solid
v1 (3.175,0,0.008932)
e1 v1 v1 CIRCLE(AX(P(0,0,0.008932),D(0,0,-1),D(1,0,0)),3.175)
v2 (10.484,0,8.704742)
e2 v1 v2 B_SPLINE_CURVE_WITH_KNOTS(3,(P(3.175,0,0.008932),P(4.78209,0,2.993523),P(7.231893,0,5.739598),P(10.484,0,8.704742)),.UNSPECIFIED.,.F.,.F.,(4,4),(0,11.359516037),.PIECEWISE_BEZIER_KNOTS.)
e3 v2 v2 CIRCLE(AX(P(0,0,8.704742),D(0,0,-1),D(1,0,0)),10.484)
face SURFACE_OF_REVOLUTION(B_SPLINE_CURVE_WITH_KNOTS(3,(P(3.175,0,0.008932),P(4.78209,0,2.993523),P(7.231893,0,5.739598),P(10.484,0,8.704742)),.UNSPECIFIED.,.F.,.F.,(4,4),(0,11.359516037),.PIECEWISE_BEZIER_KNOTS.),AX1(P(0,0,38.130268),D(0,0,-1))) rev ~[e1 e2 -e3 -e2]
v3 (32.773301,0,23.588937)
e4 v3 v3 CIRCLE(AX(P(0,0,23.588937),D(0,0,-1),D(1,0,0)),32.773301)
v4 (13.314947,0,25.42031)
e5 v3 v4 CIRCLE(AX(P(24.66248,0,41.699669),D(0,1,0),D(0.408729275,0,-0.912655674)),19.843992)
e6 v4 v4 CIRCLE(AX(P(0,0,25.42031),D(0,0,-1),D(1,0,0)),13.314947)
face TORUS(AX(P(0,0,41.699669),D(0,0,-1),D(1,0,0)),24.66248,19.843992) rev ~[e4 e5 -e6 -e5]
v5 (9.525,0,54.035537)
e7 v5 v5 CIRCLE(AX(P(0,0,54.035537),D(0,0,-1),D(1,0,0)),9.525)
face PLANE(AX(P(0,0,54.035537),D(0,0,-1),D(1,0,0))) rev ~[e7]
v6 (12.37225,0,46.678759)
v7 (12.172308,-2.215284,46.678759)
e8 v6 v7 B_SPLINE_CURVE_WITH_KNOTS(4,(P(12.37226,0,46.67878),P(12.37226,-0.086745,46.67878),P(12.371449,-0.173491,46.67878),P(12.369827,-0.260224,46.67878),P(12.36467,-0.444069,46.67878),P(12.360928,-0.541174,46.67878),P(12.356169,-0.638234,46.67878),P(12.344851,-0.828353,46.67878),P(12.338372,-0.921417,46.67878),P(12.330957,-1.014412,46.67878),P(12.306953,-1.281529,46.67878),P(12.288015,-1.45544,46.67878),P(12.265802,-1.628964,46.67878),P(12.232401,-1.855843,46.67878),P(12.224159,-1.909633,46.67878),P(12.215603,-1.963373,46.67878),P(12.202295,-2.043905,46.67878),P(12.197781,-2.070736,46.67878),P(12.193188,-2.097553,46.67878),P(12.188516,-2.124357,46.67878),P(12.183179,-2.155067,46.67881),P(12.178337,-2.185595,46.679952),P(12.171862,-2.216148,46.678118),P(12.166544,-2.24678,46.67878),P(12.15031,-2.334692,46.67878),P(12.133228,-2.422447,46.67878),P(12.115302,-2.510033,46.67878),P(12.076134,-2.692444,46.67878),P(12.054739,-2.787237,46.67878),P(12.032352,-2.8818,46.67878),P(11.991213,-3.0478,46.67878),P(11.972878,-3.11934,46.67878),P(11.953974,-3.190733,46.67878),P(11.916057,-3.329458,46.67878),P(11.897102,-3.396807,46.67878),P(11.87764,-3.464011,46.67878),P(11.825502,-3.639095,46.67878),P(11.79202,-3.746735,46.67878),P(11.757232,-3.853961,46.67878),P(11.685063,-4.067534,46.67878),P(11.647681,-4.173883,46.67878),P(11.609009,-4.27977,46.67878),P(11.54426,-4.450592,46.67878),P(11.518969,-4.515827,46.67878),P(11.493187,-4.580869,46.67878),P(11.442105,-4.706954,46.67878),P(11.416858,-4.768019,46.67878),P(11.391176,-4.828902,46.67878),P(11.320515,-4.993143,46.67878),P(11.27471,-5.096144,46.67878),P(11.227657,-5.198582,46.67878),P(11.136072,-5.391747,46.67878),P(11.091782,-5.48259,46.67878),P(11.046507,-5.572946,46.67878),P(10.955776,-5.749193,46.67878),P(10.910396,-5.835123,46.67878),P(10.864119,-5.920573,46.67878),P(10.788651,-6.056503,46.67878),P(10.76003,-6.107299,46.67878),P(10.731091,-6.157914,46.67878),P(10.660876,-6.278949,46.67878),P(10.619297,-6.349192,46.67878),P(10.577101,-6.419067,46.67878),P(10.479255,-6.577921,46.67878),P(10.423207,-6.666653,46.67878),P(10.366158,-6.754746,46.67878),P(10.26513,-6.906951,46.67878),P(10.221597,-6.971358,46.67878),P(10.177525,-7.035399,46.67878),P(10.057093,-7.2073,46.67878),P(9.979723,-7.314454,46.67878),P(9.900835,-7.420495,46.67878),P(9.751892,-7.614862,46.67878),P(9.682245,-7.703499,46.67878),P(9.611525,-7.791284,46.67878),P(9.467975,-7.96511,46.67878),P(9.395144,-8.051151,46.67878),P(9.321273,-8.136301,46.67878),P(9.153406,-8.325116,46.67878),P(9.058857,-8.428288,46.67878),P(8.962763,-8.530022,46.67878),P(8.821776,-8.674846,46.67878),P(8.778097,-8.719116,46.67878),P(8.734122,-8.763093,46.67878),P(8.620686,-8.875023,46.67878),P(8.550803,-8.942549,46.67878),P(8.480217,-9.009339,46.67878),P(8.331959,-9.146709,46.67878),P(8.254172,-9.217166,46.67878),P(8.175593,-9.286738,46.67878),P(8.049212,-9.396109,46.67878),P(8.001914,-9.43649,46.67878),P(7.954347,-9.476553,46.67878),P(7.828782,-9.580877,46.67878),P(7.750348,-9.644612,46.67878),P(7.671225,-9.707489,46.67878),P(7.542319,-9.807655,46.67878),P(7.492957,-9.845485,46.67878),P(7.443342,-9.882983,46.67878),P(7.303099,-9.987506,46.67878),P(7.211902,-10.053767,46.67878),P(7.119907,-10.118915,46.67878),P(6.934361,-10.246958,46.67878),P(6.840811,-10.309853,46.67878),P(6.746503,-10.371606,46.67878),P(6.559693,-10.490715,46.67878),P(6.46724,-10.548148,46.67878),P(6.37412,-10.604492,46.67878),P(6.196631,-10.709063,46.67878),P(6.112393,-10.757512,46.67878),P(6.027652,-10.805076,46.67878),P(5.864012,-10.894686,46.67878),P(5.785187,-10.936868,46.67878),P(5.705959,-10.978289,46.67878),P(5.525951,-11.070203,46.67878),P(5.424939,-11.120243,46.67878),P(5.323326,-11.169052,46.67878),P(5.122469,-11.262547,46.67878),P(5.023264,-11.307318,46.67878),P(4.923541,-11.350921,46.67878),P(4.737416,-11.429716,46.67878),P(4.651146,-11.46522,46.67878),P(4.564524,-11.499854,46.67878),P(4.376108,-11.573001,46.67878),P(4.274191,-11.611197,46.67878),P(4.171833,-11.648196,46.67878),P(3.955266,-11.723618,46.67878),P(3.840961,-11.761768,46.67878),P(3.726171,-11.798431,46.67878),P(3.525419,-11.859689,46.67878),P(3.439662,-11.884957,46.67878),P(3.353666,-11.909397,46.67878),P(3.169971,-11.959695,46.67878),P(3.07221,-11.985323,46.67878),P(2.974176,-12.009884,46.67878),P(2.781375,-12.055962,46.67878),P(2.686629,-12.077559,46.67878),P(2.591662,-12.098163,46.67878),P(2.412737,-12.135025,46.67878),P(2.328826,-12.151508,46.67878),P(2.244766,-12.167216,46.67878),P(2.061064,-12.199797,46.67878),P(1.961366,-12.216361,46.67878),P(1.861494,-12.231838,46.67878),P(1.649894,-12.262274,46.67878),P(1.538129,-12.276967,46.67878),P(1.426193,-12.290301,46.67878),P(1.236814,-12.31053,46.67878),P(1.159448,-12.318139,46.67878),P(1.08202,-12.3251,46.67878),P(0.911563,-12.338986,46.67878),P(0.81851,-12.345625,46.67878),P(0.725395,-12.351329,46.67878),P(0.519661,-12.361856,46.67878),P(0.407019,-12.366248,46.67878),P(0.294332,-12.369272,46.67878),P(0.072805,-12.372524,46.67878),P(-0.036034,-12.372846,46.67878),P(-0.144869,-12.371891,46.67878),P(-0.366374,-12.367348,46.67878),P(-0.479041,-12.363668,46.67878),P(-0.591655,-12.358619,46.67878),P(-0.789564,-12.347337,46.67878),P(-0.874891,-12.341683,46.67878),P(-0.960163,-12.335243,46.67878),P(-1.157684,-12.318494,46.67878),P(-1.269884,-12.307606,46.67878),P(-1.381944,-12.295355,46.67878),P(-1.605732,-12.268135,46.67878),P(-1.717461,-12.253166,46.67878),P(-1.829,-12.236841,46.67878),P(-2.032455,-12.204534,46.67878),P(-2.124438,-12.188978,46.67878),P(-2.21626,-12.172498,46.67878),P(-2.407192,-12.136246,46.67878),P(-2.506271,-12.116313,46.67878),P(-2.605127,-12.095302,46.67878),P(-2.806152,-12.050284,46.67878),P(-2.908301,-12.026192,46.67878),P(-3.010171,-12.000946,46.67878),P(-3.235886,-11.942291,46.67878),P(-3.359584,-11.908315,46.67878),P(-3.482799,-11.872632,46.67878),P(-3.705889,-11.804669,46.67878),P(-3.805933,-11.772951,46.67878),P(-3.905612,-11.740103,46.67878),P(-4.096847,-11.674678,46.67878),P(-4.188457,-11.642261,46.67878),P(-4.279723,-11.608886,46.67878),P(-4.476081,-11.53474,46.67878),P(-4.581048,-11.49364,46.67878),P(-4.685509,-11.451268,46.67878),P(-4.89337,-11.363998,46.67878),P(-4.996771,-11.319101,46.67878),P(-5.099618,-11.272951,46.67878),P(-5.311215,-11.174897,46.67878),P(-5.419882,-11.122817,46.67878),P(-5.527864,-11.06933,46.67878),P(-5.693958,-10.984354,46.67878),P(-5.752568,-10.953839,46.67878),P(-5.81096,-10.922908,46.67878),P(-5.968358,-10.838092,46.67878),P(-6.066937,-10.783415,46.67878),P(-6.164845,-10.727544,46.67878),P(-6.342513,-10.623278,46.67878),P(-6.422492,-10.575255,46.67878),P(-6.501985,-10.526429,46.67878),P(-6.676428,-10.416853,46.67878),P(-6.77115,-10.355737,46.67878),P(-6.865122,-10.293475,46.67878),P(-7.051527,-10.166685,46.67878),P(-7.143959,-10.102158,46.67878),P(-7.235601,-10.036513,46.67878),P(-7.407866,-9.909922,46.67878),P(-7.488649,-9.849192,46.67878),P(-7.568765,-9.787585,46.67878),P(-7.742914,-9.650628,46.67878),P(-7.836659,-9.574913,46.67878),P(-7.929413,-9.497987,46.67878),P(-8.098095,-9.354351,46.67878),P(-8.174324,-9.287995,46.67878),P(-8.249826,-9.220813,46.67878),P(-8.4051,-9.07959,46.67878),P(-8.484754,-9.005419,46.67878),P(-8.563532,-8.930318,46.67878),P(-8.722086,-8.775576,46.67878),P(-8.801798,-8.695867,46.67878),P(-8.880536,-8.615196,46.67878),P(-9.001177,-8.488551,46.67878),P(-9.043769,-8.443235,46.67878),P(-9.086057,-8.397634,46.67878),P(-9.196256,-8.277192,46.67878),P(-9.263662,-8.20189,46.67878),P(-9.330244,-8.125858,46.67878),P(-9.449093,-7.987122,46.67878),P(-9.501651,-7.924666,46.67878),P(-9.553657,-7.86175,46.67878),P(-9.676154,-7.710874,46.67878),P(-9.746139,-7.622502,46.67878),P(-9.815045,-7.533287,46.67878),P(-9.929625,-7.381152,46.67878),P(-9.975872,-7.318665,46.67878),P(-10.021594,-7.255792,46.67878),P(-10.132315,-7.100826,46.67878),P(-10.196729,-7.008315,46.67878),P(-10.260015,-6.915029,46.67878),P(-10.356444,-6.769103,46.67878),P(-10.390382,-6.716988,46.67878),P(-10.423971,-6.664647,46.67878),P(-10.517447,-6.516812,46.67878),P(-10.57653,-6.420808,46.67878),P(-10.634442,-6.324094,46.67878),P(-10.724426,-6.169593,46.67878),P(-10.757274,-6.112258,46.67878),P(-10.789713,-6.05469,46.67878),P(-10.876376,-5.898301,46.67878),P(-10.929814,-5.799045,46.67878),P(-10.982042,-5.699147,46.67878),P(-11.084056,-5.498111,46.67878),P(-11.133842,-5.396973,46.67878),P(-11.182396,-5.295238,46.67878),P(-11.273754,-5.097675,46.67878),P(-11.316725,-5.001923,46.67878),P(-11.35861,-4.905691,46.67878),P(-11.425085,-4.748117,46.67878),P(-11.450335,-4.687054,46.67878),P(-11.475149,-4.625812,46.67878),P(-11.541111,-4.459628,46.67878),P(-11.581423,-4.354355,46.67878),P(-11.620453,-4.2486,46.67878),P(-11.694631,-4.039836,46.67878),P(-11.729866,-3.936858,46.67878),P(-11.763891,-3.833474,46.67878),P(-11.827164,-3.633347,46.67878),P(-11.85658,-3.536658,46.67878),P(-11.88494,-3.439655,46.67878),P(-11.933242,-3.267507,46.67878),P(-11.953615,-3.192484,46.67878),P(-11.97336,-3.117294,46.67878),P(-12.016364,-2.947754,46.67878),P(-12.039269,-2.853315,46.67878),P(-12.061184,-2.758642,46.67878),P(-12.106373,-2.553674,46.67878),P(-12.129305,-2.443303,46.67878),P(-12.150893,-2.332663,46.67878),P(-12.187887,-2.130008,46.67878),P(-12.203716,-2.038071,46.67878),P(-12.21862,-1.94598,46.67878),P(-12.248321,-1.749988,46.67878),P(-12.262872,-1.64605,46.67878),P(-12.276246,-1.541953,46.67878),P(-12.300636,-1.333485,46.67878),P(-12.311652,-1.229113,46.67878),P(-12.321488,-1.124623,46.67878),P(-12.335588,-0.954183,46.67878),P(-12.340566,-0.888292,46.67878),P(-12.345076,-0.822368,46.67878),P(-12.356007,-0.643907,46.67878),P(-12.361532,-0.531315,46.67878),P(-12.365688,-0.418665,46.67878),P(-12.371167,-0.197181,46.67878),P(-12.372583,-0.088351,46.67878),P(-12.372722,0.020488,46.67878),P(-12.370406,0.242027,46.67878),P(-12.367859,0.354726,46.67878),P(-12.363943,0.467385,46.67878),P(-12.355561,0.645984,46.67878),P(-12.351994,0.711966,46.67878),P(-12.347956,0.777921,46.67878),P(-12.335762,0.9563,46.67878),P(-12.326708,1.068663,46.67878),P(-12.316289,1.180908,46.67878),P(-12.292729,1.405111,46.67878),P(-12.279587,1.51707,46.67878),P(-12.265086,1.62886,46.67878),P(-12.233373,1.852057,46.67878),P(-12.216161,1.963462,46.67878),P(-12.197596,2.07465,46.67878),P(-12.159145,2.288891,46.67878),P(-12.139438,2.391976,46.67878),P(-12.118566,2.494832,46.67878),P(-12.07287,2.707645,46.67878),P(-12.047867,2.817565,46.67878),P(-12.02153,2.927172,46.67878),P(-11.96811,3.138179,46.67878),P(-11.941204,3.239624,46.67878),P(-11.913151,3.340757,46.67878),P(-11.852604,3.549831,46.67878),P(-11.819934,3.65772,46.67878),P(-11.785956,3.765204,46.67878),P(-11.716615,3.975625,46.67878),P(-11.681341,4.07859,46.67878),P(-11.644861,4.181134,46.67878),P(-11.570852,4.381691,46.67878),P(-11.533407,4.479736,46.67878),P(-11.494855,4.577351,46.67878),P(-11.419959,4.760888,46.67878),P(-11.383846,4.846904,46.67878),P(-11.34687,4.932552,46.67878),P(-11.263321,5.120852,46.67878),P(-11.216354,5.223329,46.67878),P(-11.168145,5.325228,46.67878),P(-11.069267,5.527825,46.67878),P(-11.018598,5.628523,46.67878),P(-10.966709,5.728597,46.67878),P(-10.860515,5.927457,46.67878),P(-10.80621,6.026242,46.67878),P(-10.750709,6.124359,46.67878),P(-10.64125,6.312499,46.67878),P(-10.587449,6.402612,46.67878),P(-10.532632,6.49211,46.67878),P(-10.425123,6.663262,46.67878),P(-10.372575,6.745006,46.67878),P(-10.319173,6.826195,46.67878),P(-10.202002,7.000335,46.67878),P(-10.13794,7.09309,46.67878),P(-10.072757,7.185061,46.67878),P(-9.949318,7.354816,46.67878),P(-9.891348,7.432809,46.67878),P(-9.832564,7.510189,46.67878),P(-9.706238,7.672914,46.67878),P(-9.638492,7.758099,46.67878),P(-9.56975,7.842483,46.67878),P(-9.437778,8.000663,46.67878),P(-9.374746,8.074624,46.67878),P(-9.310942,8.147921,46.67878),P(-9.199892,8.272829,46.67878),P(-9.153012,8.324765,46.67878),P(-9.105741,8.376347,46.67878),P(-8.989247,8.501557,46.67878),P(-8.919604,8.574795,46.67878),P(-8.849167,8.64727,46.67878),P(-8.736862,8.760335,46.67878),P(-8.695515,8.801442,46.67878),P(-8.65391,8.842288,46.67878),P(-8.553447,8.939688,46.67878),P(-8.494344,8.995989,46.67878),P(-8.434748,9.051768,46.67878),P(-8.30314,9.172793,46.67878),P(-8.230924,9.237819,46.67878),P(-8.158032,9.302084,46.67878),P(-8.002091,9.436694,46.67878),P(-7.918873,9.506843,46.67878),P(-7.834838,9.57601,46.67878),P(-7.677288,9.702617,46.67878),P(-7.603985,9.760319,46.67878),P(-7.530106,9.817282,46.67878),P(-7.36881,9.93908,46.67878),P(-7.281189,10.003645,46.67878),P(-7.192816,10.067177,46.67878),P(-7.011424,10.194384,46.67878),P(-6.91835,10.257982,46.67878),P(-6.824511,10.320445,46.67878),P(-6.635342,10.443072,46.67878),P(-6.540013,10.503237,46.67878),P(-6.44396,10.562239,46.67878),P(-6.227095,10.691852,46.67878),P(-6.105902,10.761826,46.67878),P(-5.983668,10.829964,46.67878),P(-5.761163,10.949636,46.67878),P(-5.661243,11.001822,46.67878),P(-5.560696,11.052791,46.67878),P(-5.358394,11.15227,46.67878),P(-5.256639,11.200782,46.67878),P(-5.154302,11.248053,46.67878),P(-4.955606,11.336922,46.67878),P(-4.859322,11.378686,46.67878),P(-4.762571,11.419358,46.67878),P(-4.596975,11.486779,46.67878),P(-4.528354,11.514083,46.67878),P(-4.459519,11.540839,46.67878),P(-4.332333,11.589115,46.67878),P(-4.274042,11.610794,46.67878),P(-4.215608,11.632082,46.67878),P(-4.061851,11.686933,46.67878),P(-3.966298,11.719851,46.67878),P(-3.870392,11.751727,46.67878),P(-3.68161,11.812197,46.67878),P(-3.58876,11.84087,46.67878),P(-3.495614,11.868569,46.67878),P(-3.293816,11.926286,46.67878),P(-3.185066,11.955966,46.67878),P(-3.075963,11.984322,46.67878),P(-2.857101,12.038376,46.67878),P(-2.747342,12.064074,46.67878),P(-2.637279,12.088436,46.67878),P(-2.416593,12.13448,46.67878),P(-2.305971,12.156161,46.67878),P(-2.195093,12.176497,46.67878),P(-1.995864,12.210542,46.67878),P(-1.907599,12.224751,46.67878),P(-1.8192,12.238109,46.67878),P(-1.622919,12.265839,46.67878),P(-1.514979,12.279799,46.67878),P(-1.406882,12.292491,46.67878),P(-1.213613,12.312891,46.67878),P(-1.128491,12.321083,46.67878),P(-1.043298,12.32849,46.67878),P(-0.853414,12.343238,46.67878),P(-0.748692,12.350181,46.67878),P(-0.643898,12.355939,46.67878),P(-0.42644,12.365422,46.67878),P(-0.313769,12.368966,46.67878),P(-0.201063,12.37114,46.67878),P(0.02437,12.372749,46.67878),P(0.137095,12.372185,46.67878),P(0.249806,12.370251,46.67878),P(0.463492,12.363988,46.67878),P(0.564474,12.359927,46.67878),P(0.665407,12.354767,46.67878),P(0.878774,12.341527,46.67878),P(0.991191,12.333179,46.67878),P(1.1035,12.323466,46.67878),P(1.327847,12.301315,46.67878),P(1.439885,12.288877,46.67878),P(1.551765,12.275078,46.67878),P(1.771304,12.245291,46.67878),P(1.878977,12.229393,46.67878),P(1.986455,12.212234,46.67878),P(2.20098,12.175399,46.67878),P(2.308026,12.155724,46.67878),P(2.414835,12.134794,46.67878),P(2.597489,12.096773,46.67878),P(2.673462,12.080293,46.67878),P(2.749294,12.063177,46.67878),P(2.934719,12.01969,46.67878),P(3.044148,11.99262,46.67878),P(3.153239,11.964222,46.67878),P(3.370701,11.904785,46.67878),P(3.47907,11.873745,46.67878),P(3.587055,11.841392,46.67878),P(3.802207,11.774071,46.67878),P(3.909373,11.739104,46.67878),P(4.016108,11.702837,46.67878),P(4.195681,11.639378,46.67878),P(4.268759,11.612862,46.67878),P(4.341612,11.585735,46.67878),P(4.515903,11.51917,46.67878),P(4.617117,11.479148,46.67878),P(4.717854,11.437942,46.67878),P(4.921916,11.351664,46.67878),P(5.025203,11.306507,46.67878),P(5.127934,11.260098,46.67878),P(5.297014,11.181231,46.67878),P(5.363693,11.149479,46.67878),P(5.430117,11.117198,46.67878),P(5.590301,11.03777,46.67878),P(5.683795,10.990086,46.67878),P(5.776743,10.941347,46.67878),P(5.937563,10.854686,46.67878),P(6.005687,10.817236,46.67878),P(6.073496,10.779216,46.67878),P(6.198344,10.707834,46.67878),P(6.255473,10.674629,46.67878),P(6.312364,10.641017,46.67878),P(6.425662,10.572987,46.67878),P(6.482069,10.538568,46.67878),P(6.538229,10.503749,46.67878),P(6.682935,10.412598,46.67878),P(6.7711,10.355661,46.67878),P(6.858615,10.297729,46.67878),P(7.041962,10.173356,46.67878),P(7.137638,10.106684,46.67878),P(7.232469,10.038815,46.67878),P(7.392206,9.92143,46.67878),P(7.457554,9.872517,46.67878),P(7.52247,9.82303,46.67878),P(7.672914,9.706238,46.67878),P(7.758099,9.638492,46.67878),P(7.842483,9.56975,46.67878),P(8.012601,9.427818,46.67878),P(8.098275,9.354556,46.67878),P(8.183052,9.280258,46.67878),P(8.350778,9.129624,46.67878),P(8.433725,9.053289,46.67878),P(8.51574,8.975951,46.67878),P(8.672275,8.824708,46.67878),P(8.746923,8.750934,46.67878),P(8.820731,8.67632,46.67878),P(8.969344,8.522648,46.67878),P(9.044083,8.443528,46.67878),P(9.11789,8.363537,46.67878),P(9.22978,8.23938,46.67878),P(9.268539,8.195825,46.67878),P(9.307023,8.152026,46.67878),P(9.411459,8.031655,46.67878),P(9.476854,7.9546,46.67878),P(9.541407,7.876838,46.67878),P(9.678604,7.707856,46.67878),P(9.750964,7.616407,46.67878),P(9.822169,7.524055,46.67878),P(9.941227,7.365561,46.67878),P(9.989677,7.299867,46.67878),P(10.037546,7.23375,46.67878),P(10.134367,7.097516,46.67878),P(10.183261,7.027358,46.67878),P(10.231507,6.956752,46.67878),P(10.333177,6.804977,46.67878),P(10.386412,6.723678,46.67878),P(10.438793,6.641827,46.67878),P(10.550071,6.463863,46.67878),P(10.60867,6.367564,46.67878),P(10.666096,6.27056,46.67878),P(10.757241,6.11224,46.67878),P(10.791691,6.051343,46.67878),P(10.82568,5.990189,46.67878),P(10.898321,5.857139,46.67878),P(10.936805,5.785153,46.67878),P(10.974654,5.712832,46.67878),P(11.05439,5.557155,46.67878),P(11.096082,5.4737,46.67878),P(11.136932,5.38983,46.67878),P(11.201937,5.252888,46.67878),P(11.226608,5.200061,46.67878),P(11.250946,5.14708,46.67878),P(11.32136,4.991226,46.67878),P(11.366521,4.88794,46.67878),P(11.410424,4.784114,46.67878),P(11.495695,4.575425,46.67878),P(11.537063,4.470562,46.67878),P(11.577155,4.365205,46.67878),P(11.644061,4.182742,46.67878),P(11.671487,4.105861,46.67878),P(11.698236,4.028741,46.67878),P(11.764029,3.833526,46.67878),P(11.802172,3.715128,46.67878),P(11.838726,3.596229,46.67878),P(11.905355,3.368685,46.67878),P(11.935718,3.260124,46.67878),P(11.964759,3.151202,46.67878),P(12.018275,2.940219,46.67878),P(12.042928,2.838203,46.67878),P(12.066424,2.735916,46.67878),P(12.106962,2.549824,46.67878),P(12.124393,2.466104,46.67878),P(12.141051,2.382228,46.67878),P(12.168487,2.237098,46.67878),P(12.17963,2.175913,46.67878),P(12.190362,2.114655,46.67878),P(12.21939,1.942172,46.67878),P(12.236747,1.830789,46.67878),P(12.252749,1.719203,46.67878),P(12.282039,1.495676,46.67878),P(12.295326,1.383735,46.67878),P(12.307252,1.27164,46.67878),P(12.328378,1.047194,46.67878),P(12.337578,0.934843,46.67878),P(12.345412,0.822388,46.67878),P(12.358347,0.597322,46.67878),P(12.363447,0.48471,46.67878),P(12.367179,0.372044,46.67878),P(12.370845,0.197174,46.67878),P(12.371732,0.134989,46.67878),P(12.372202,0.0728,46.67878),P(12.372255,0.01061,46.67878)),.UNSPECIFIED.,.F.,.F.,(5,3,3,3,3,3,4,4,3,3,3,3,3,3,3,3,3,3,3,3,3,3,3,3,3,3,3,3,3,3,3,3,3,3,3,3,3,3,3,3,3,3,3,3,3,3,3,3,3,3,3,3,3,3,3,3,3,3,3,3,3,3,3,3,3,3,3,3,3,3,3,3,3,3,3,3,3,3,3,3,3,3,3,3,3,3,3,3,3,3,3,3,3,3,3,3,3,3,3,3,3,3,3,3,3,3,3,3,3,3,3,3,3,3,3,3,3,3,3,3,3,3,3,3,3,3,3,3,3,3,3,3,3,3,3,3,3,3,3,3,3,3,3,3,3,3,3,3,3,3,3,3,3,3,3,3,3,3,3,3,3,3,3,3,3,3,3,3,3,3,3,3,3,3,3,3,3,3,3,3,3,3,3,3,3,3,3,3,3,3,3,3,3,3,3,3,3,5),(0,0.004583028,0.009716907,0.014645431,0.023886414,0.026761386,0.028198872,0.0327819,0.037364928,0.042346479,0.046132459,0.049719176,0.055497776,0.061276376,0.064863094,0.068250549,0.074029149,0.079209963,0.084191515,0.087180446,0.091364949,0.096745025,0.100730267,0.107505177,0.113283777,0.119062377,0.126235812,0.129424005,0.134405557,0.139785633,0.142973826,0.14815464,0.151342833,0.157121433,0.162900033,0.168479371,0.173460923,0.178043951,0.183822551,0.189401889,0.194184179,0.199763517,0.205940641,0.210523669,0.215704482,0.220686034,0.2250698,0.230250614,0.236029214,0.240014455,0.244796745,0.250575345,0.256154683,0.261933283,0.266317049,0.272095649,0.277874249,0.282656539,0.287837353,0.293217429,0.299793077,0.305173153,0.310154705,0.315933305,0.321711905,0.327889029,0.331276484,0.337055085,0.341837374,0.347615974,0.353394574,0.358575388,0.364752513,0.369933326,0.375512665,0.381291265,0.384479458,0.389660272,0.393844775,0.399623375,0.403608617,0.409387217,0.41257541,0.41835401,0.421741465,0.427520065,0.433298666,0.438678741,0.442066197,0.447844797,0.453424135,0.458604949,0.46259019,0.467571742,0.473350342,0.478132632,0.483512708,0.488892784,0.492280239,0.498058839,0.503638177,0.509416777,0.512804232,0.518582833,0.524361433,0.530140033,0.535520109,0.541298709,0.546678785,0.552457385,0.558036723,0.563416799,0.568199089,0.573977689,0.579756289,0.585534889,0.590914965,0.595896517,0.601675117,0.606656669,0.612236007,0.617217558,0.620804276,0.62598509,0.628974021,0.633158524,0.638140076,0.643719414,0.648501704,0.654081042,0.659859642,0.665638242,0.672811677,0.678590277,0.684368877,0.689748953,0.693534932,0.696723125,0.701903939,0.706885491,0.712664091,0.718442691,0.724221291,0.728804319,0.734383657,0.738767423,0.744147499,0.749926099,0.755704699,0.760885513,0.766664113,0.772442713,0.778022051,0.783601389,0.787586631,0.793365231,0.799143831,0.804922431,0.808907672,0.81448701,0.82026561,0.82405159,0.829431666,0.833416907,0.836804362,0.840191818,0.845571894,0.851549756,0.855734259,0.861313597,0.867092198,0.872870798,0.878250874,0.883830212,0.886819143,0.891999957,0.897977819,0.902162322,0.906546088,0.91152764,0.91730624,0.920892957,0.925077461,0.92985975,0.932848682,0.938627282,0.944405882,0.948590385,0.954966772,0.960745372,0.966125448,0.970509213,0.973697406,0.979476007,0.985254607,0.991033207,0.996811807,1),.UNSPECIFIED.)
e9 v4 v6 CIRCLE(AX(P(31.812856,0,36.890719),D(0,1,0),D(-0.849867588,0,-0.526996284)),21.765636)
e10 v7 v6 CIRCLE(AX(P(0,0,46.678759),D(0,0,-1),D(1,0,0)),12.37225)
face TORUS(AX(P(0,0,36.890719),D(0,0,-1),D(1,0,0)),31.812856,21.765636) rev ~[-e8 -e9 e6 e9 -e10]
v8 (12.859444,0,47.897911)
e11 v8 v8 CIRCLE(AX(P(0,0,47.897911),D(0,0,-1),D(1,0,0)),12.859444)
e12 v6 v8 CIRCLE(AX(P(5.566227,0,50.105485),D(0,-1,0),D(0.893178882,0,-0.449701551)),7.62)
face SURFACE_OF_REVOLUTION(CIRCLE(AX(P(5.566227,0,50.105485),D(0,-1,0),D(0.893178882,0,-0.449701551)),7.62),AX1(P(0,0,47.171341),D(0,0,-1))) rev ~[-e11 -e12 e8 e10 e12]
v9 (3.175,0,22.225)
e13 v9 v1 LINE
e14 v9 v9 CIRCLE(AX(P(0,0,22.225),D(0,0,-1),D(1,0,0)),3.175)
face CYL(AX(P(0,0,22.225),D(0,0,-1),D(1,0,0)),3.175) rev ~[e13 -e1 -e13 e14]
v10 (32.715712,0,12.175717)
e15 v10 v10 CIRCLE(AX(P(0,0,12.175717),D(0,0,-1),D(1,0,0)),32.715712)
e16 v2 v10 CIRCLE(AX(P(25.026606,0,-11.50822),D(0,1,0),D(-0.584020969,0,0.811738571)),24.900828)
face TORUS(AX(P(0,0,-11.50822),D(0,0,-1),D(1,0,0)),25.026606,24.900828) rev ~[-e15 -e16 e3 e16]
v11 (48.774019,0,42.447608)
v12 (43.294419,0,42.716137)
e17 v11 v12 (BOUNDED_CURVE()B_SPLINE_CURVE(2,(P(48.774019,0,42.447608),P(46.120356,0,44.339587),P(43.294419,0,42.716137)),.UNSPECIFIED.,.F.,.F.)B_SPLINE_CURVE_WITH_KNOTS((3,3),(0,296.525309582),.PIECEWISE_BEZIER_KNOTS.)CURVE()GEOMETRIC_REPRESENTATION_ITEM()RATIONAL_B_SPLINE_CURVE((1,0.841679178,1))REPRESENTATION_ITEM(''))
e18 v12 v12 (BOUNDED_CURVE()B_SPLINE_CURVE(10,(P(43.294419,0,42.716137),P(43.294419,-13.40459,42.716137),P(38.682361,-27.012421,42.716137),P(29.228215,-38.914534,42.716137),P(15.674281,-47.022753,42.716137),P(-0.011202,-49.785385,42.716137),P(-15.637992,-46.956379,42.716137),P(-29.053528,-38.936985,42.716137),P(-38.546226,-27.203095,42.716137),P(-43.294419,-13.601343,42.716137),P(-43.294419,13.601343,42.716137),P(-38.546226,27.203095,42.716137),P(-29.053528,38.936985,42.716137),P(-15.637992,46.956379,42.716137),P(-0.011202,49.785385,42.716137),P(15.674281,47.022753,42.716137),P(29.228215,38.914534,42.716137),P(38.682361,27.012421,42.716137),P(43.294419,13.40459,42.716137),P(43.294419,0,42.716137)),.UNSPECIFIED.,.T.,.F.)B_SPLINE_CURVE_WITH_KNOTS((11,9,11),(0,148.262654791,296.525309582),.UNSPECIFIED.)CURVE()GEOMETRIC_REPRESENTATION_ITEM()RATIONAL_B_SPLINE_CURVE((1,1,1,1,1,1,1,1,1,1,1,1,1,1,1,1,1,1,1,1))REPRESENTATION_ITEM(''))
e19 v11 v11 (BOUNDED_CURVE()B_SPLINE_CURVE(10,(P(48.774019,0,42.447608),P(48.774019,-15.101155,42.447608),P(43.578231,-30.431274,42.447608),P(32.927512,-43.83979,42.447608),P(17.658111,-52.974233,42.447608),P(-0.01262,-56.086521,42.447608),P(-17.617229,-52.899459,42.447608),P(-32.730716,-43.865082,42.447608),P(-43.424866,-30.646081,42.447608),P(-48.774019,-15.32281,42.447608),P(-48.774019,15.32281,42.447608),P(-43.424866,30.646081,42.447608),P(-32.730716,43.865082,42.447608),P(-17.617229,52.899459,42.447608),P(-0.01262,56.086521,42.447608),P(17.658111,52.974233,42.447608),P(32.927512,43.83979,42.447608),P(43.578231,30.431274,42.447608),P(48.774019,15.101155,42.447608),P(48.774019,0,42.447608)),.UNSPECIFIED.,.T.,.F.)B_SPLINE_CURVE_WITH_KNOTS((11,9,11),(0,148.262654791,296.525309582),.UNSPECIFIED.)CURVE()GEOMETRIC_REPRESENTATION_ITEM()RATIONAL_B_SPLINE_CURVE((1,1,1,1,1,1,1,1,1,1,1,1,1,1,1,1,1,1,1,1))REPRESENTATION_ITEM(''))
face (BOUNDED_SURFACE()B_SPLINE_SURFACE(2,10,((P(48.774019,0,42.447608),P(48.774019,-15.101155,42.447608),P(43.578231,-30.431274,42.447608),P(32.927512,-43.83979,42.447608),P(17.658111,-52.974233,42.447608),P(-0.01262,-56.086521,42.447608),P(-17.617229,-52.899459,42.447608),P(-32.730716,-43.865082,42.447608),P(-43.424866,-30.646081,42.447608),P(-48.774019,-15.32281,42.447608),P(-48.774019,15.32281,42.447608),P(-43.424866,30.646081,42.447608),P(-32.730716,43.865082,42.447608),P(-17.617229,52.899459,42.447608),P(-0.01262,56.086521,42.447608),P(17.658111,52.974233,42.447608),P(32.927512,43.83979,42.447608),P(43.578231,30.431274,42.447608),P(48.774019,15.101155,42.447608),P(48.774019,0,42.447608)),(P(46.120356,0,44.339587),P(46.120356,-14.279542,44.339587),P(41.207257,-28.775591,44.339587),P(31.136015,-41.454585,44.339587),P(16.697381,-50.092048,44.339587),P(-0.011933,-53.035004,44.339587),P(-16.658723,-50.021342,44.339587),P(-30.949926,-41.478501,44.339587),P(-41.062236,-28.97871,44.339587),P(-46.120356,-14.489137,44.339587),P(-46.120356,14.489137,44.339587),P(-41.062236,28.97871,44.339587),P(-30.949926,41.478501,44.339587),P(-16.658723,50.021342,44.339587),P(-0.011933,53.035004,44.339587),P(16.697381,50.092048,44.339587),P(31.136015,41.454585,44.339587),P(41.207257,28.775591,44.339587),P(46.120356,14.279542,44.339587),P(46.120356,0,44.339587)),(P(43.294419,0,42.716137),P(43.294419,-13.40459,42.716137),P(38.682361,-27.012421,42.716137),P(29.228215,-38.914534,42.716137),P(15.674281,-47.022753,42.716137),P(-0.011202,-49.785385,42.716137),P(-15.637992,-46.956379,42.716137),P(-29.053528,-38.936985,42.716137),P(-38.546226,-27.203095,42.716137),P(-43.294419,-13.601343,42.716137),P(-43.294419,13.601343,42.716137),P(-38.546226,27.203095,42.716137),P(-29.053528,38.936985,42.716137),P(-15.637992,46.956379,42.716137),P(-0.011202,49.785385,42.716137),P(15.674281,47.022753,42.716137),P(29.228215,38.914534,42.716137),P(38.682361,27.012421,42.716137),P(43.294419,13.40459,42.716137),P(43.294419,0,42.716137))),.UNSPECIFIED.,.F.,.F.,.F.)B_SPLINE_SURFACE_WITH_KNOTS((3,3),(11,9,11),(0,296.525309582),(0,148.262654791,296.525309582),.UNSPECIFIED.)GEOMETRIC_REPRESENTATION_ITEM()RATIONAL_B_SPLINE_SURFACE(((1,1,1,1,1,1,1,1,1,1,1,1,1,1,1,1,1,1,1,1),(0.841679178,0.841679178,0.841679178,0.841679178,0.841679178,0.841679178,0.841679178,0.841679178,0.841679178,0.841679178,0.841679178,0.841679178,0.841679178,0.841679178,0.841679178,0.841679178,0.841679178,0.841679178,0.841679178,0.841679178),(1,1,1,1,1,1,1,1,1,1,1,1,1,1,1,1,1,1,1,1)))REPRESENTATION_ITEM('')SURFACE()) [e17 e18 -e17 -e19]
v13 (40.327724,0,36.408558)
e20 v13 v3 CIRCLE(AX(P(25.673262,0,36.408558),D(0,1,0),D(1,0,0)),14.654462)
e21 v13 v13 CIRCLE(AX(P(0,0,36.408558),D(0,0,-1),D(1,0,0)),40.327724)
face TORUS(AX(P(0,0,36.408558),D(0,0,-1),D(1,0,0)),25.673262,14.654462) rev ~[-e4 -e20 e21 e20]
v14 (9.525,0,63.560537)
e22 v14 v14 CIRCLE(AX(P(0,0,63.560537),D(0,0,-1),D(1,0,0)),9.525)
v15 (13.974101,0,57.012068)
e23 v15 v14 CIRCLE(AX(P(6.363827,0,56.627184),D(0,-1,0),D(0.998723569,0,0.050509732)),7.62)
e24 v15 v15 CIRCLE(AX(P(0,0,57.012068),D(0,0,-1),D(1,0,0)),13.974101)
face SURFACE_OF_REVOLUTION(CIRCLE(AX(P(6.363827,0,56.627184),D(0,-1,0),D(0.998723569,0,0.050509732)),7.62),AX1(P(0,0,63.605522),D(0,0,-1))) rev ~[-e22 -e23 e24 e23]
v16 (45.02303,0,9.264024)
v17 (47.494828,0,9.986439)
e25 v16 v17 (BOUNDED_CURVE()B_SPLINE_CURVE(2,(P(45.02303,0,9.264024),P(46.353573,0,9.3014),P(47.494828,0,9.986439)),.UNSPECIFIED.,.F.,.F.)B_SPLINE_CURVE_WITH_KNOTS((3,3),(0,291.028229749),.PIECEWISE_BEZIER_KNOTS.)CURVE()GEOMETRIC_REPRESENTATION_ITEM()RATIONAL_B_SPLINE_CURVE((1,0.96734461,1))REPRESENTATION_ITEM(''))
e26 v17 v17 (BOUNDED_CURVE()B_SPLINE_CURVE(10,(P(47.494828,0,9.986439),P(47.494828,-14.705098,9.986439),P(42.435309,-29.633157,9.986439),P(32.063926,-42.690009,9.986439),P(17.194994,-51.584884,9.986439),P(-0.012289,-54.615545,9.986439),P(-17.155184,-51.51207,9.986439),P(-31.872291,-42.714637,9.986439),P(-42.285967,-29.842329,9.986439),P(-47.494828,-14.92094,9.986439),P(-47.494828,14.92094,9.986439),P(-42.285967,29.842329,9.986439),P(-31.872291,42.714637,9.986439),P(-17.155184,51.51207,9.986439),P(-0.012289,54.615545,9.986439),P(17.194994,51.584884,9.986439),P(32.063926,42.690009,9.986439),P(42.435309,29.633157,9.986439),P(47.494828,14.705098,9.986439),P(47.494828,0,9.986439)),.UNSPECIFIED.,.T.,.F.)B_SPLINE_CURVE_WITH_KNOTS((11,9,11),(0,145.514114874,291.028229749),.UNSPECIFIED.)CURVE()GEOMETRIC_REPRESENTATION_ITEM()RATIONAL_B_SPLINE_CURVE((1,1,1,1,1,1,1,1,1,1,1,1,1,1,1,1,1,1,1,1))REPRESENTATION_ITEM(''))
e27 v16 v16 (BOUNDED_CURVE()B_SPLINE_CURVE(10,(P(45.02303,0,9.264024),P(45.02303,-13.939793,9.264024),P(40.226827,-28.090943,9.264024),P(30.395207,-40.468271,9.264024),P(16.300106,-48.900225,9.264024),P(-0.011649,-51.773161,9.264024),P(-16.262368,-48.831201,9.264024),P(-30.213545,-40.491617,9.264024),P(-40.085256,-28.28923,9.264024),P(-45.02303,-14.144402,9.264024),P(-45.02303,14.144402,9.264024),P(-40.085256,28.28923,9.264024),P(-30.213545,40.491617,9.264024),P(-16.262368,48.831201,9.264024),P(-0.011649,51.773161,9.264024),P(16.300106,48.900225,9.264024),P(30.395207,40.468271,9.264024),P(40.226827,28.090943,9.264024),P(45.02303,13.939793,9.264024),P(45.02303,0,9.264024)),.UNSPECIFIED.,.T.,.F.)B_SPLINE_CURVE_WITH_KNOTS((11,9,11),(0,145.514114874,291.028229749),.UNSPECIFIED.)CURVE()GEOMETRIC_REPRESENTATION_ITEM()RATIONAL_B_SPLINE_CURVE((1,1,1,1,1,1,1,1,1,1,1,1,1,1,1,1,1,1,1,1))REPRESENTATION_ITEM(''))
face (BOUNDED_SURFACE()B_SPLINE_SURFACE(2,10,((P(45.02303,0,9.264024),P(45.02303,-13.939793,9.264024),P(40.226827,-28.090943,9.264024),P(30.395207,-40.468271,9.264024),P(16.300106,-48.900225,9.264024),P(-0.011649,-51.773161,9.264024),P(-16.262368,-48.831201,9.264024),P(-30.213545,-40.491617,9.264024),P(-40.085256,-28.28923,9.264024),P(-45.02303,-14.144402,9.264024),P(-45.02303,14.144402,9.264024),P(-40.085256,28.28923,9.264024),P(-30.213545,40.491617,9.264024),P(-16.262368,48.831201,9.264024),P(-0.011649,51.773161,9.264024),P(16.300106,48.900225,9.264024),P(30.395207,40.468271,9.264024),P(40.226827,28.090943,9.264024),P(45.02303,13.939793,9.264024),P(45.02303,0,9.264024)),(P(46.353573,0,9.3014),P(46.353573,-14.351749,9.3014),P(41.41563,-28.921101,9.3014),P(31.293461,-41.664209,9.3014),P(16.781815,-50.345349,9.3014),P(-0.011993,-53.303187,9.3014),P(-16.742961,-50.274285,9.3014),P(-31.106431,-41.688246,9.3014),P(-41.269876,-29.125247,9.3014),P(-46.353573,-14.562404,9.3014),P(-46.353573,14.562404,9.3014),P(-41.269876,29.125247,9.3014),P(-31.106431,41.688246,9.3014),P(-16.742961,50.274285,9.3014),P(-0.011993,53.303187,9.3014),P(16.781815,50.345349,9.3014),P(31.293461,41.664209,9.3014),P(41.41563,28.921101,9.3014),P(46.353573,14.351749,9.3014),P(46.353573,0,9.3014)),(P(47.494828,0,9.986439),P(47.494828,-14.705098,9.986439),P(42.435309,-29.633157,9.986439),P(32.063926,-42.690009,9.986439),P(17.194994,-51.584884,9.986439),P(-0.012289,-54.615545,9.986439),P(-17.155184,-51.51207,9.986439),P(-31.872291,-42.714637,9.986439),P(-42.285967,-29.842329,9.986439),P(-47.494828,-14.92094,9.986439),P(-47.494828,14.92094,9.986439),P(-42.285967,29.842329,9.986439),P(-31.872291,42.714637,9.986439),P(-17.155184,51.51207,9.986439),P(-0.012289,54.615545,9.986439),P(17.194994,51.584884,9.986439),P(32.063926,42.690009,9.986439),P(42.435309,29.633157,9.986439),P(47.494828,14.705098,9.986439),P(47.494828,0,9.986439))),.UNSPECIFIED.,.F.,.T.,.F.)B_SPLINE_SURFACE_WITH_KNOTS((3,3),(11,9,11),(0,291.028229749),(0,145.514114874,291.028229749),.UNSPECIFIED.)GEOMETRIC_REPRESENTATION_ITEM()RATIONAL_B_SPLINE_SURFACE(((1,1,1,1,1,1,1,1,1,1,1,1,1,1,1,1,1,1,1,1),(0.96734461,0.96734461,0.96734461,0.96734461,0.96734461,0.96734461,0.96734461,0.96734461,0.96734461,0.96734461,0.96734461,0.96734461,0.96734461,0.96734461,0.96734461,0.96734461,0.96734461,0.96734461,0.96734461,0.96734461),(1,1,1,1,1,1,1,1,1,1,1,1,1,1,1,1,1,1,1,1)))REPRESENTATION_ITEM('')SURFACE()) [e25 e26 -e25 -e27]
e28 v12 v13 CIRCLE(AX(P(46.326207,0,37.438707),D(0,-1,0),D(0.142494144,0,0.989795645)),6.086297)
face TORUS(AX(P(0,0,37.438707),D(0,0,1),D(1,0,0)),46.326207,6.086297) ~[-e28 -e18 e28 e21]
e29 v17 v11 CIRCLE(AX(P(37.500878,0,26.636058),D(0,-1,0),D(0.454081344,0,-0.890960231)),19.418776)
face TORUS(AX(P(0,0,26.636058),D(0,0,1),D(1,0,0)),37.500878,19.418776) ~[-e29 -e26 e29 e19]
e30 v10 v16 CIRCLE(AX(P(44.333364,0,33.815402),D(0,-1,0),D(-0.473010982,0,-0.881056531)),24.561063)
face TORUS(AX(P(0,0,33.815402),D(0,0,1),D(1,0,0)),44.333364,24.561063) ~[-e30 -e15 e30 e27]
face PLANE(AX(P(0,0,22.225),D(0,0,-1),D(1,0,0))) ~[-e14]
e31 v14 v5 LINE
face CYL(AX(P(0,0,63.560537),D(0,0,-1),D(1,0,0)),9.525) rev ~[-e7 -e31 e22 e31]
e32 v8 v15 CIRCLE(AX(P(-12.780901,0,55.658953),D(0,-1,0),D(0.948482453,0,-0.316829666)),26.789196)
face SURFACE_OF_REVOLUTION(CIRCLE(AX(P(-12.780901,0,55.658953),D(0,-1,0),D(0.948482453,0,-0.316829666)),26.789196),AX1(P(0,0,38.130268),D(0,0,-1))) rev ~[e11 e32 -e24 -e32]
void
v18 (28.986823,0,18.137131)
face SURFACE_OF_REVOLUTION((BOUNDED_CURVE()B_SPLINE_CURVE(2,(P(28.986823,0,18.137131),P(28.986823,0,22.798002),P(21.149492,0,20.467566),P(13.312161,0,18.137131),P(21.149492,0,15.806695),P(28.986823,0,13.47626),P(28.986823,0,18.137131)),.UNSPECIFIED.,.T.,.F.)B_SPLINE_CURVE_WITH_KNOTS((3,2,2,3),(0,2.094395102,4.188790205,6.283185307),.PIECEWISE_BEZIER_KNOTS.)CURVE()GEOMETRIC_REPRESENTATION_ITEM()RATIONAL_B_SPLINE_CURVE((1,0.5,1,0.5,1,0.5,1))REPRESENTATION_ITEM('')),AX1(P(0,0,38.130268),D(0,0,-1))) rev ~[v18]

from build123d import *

# Parameters (mm, degrees)
F3_R = 5.08


# Not quite as in the source:
# - a fillet or chamfer that OpenCascade refuses, or shapes differently, is made with other operations: its cross-section is extruded or revolved along the edge and cut away or added


with BuildPart() as f1:
    # F0 (on Front) → F1 (revolve)
    with BuildSketch(Plane.XZ):
        with BuildLine():
            ThreePointArc((10.483999793, 8.704742402), (21.1854429071, 13.0945583058), (32.7157117426, 12.1757172026))
            ThreePointArc((32.7157117426, 12.1757172026), (39.3120301411, 9.7731057066), (46.3185813438, 9.3347010317))
            ThreePointArc((46.3185813438, 9.3347010317), (56.913275672, 26.1384147265), (47.1934687719, 43.4628972777))
            ThreePointArc((47.1934687719, 43.4628972777), (41.9646383543, 41.683671942), (40.3277240694, 36.4085584879))
            ThreePointArc((40.3277240694, 36.4085584879), (38.2986433941, 28.968598665), (32.7733010054, 23.5889367759))
            ThreePointArc((32.7733010054, 23.5889367759), (22.8030292444, 21.94298724), (13.3149474859, 25.4203099757))
            ThreePointArc((13.3149474859, 25.4203099757), (10.0580612498, 36.2038345129), (12.6281818375, 47.1713405905))
            ThreePointArc((12.6281818375, 47.1713405905), (14.00678773, 55.3747288113), (12.802552498, 63.605521605))
            Line((12.802552498, 63.605521605), (9.525, 63.5605369449))
            Line((9.525, 63.5605369449), (9.525, 54.0355369449))
            Line((9.525, 54.0355369449), (0, 54.0355369449))
            Line((0, 54.0355369449), (0, 22.225))
            Line((0, 22.225), (3.175, 22.225))
            Line((3.175, 22.225), (3.175, 0.0089315357))
            add(Edge.make_bspline(
                [(3.175, 0.0089315357), (4.7820895363, 2.9935227133), (7.2318930179, 5.7395980693), (10.483999793, 8.704742402)],
                knots=[0, 0, 0, 0, 11.3595160371, 11.3595160371, 11.3595160371, 11.3595160371], degree=3))
        make_face()
        with BuildLine():
            add(Edge.make_bspline(
                [(28.9868229892, 18.1371308863), (28.9868229892, 22.7980019483), (21.1494918035, 20.4675664173), (13.3121606178, 18.1371308863), (21.1494918035, 15.8066953553), (28.9868229892, 13.4762598243), (28.9868229892, 18.1371308863)],
                knots=[0, 0, 0, 2.0943951024, 2.0943951024, 4.1887902048, 4.1887902048, 6.2831853072, 6.2831853072, 6.2831853072], degree=2, weights=[1, 0.5, 1, 0.5, 1, 0.5, 1]))
        make_face(mode=Mode.SUBTRACT)
    revolve(axis=Axis((0, 0, 38.1302684724), (0, 0, -1)))

    # F2: fillet of radius 7.62 on 3 edges, made by hand

    # F2_s1 → F2_t2 (revolve, cut)
    with BuildSketch(Plane.XZ):
        with BuildLine():
            ThreePointArc((12.3722496536, 46.678759053), (12.6421523847, 47.2778226001), (12.8594436815, 47.8979105858))
            Line((12.8594436815, 47.8979105858), (13.0053080236, 47.8537591001))
            ThreePointArc((13.0053080236, 47.8537591001), (12.8916191279, 47.4875799167), (12.7727305633, 47.1230557494))
            Line((12.7727305633, 47.1230557494), (12.762510297, 47.0993570856))
            ThreePointArc((12.762510297, 47.0993570856), (12.6338808137, 46.8556010296), (12.5083701151, 46.6102245366))
            Line((12.5083701151, 46.6102245366), (12.3722496536, 46.678759053))
        make_face()
    revolve(axis=Axis((0, 0, 47.1713405905), (0, 0, -1)), mode=Mode.SUBTRACT)

    # F2_s3 → F2_t4 (revolve, cut)
    with BuildSketch(Plane.XZ):
        with BuildLine():
            ThreePointArc((13.9741009654, 57.0120678291), (12.6667334765, 60.9094464641), (9.525, 63.5605369449))
            Line((9.525, 63.5605369449), (9.5882234526, 63.6992040103))
            ThreePointArc((9.5882234526, 63.6992040103), (11.1616847443, 63.7354149226), (12.8004609933, 63.7579072526))
            Line((12.8004609933, 63.7579072526), (12.9480931941, 63.6507285267))
            ThreePointArc((12.9480931941, 63.6507285267), (13.7452153435, 60.372207963), (14.1263064373, 57.0197655122))
            Line((14.1263064373, 57.0197655122), (13.9741009654, 57.0120678291))
        make_face()
    revolve(axis=Axis((0, 0, 63.605521605), (0, 0, -1)), mode=Mode.SUBTRACT)

    # F3
    f3_edges = [f1.edges().sort_by_distance(p)[0] for p in [
        (-47.193469, 0, 43.462897),
        (-46.318581, 0, 9.334701),
        (56.913276, 0, 26.138415),
    ]]
    fillet(f3_edges, radius=F3_R)


solid = f1.part
